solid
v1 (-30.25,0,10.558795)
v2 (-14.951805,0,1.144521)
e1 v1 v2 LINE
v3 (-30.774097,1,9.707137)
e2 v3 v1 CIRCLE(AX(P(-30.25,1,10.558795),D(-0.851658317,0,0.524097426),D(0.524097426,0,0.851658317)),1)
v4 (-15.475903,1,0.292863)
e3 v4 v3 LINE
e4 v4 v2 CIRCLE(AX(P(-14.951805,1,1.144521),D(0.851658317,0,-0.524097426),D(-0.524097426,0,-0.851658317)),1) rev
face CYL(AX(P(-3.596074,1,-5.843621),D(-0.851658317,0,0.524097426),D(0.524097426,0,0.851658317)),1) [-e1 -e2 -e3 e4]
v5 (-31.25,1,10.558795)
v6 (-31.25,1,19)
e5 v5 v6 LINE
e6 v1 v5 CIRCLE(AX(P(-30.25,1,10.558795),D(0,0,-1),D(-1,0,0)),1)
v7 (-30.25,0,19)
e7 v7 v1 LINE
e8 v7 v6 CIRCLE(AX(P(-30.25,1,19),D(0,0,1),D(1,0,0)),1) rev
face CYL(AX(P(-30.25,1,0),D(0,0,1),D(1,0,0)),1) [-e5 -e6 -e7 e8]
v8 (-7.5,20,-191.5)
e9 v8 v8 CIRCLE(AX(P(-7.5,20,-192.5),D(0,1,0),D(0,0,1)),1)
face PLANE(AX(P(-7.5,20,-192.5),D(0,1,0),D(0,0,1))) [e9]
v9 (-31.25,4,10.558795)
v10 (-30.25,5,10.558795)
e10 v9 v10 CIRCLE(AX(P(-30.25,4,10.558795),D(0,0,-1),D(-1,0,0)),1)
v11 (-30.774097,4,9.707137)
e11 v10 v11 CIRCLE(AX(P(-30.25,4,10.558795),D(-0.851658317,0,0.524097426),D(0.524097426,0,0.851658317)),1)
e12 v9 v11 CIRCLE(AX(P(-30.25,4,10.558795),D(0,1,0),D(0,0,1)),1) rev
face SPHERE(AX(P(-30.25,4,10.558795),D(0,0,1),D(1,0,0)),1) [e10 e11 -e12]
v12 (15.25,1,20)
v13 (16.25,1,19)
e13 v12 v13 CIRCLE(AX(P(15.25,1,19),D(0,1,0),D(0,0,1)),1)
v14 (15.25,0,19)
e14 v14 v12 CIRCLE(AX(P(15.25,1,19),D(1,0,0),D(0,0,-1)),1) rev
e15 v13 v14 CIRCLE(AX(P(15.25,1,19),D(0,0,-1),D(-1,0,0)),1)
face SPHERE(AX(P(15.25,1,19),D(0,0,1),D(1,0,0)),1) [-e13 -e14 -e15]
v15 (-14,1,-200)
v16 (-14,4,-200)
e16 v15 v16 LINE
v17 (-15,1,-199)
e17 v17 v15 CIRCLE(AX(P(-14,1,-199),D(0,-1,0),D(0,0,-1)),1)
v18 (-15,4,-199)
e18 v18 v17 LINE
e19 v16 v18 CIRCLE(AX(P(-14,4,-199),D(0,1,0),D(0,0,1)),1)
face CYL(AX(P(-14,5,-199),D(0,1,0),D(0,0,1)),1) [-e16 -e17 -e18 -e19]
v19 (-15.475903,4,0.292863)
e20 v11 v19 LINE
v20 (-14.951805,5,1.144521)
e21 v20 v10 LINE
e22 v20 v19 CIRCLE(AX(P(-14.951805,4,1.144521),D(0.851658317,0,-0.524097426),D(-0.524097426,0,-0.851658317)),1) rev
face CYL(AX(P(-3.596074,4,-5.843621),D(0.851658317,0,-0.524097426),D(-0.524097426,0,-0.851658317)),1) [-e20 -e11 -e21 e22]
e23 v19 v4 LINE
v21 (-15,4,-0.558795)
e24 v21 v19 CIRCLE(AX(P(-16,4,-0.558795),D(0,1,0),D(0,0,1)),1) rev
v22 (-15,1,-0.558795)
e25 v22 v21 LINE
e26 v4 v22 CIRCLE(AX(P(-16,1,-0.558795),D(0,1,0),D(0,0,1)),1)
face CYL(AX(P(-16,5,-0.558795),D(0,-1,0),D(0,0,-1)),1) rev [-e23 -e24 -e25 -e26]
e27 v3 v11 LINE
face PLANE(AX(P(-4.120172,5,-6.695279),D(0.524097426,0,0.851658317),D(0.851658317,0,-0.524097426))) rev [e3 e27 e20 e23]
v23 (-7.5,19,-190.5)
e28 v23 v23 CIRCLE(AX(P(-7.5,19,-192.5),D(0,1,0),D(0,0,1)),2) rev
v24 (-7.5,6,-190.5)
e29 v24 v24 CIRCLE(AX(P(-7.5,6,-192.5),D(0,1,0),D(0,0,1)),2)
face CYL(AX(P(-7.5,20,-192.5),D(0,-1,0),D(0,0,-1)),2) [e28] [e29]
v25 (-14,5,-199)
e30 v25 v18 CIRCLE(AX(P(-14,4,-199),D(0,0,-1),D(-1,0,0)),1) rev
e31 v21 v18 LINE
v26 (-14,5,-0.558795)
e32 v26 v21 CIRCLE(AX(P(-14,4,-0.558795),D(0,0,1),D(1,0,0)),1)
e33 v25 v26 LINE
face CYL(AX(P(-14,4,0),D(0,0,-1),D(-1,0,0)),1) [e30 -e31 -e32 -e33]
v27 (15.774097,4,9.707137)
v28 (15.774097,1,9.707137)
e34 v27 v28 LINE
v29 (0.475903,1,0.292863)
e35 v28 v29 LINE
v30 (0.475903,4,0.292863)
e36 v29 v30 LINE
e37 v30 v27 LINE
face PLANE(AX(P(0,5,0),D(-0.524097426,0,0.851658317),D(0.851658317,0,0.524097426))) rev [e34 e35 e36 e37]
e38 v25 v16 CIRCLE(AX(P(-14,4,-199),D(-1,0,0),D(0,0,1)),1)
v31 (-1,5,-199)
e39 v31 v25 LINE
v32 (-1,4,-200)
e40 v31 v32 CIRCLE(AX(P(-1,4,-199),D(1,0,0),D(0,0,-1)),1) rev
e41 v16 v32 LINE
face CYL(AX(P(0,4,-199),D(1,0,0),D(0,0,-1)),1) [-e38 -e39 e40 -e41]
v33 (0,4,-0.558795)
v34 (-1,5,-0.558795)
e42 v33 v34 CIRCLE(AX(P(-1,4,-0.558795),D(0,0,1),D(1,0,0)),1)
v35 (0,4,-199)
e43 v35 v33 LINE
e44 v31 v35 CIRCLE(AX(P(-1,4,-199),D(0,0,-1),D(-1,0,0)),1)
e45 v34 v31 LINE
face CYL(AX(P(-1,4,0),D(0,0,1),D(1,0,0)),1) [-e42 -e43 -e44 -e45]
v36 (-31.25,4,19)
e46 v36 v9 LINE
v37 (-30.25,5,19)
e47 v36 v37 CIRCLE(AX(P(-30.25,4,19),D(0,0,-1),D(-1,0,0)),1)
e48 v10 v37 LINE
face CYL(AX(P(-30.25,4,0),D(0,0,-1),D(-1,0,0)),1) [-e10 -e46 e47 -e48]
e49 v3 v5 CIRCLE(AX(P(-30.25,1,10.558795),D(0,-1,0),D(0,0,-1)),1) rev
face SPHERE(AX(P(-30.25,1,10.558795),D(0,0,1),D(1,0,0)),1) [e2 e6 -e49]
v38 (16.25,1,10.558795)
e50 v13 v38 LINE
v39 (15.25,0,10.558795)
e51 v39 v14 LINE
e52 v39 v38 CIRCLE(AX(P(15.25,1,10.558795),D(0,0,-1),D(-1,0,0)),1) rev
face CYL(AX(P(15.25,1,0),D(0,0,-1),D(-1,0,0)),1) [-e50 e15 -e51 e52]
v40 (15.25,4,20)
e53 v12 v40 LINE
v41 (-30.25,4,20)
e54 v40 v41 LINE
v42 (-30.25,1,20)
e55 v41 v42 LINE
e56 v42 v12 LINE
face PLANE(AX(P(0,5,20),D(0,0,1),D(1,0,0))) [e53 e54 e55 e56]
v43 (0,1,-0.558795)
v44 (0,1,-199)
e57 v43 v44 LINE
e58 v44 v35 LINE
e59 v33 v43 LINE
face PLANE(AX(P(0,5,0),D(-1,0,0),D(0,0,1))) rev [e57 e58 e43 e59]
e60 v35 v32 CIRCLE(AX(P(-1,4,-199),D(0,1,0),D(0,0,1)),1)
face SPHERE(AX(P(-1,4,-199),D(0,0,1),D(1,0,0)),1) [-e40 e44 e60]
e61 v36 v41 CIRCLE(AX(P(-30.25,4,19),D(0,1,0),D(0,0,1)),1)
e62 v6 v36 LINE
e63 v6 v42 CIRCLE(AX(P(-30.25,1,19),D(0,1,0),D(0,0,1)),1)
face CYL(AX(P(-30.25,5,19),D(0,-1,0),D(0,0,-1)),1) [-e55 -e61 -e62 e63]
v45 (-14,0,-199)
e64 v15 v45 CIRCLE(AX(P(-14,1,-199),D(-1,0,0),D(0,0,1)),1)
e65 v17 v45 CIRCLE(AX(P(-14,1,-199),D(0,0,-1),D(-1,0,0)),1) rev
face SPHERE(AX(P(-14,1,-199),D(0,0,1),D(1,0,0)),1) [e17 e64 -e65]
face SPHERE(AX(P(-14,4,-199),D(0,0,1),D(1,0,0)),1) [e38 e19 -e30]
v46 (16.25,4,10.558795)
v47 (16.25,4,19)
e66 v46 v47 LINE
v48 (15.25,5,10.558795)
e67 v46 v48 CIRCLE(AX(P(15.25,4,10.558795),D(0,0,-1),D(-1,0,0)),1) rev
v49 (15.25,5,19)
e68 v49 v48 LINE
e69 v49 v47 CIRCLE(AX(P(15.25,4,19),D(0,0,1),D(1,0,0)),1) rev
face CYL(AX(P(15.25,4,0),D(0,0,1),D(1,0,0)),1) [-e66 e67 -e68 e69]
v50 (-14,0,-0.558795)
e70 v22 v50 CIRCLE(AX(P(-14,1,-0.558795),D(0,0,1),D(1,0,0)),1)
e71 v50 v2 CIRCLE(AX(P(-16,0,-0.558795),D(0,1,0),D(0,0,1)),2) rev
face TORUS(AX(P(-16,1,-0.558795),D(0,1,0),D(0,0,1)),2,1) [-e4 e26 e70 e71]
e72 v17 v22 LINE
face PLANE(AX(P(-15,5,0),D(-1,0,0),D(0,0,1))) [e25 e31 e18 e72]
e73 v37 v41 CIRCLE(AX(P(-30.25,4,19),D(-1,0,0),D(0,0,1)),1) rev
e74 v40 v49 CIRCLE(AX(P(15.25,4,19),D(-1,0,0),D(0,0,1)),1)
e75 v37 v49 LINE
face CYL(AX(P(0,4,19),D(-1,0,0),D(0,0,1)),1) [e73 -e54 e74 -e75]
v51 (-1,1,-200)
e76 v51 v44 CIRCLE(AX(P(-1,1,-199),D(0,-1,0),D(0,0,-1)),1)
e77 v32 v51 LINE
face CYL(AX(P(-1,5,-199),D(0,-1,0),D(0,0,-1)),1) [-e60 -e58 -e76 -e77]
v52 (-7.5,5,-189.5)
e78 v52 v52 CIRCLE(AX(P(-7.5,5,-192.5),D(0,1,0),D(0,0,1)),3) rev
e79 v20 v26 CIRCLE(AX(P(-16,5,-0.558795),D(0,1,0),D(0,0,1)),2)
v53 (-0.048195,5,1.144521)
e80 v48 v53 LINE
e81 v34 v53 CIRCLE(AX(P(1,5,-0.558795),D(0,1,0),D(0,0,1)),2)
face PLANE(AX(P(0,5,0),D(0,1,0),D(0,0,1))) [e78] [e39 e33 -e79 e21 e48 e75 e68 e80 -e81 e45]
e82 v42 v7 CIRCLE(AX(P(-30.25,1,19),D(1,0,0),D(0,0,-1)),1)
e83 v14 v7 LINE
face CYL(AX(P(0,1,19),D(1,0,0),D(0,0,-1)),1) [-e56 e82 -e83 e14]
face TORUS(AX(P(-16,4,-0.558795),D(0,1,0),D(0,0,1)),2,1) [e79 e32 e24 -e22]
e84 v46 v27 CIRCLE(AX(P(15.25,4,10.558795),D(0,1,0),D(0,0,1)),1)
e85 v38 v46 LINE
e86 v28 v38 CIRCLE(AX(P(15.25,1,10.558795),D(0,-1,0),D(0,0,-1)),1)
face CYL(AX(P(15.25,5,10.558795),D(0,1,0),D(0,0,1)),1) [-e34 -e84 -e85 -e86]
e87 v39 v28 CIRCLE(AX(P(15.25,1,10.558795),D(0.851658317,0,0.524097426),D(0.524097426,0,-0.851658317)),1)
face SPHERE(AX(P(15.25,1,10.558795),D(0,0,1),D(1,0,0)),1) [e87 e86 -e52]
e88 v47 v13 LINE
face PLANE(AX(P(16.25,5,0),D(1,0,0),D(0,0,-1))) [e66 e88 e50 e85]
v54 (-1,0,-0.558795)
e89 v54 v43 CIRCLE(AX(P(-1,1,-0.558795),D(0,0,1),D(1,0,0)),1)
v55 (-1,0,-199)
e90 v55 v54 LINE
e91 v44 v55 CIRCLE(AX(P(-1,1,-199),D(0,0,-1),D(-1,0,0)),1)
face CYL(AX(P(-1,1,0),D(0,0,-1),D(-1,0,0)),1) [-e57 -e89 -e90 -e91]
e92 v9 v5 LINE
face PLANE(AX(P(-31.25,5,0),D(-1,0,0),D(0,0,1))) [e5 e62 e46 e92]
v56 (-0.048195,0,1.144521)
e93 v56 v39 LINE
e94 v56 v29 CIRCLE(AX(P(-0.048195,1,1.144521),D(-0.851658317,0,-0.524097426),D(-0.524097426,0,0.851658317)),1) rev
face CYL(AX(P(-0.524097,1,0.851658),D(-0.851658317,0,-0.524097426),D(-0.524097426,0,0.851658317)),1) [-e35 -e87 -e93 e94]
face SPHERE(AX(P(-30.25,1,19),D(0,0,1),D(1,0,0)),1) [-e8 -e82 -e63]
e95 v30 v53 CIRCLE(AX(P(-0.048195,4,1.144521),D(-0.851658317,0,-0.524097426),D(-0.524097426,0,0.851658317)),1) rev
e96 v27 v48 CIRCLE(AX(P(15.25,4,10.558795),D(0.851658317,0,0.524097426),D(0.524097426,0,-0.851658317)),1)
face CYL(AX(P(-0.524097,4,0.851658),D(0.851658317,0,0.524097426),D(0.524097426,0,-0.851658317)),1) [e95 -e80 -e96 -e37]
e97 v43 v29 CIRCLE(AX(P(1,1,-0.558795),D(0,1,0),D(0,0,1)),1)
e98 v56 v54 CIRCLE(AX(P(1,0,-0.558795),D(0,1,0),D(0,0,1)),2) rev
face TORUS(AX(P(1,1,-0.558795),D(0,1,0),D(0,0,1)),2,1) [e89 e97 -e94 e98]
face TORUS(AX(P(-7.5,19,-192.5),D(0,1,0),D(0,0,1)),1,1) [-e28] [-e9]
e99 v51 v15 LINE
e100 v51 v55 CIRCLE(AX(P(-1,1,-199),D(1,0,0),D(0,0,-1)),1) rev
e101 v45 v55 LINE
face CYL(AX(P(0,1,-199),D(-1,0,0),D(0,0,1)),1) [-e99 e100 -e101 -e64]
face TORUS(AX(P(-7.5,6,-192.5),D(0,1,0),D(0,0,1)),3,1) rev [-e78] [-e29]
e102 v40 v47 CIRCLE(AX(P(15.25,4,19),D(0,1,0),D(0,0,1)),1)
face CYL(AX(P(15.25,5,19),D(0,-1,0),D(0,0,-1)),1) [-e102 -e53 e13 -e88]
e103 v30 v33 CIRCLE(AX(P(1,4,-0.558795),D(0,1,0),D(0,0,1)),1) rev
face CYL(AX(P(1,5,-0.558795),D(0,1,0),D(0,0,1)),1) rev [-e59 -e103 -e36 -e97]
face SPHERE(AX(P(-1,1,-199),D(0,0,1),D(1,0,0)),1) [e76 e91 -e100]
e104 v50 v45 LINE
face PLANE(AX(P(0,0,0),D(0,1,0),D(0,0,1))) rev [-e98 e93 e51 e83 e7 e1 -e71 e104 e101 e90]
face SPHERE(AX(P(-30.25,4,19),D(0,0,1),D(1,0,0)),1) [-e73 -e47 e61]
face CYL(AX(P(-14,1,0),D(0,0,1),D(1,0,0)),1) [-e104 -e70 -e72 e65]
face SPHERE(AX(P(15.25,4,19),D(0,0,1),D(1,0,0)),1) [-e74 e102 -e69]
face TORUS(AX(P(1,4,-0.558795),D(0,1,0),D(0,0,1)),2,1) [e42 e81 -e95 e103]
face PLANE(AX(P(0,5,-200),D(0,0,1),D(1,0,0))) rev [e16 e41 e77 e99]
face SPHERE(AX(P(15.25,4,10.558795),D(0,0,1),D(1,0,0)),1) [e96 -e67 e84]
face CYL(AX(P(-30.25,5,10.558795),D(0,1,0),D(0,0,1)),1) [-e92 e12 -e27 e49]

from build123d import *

# Parameters (mm, degrees)
SKETCH1_W           = 15
SKETCH1_H           = 200
SKETCH1_W_2         = 47.5
SKETCH1_H_2         = 10
BOSS_EXTRUDE1_DEPTH = 5
SKETCH4_R           = 2
BOSS_EXTRUDE3_DEPTH = 15
FILLET5_R           = 1
FILLET6_R           = 1


with BuildPart() as part:
    # Sketch1 → Boss-Extrude1 (new body)
    with BuildSketch(Plane(origin=(0, 0, 0), x_dir=(1, 0, 0), z_dir=(0, 1, 0))):
        Polygon((-31.25, -10), (16.25, -10), (0, 0), (-15, 0), align=None)
        with Locations((-7.5, 100)):
            Rectangle(SKETCH1_W, SKETCH1_H)
        with Locations((-7.5, -15)):
            Rectangle(SKETCH1_W_2, SKETCH1_H_2)
    extrude(amount=BOSS_EXTRUDE1_DEPTH)

    # Sketch4 → Boss-Extrude3 (add)
    with BuildSketch(Plane(origin=(0, 5, 0), x_dir=(1, 0, 0), z_dir=(0, 1, 0))):
        with Locations(Location((-7.5, 192.5, 0), (0, 0, 270))):
            Circle(SKETCH4_R)
    extrude(amount=BOSS_EXTRUDE3_DEPTH)

    # Fillet5
    fillet5_edges = [part.edges().sort_by_distance(p)[0] for p in [
        (-31.25, 5, 15),
        (-7.5, 0, -200),
        (0, 0, -100),
        (8.125, 0, 5),
        (16.25, 0, 15),
        (-7.5, 0, 20),
        (-31.25, 0, 15),
        (-23.125, 0, 5),
        (-7.5, 5, 20),
        (-15, 2.5, 0),
        (-15, 2.5, -200),
        (0, 2.5, -200),
        (0, 2.5, 0),
        (16.25, 2.5, 10),
        (-31.25, 2.5, 10),
        (16.25, 5, 15),
        (8.125, 5, 5),
        (-7.5, 5, -194.5),
        (-7.5, 20, -194.5),
        (0, 5, -100),
        (-7.5, 5, -200),
        (-15, 5, -100),
        (-23.125, 5, 5),
        (-15, 0, -100),
    ]]
    fillet(fillet5_edges, radius=FILLET5_R)

    # Fillet6
    # the kernel refuses this fillet: 1 mm, written as the material it takes off along each edge
    with BuildSketch(Plane(origin=(15.25, 4, 19), x_dir=(1, 0, 0), z_dir=(0, 0, 1))) as fillet6_piece_1_section:
        Polygon((0, 0), (FILLET6_R, 0), (FILLET6_R, FILLET6_R), (0, FILLET6_R), align=None)
    fillet6_piece_1 = extrude(amount=FILLET6_R, mode=Mode.PRIVATE)
    fillet6_piece_1 = fillet6_piece_1 - Plane(origin=(15.25, 4, 19), x_dir=(-0.7071067811865475, -0.7071067811865475, 0), z_dir=(0, 0, 1)) * Sphere(FILLET6_R, mode=Mode.PRIVATE)
    add(fillet6_piece_1, mode=Mode.SUBTRACT)
    with BuildSketch(Plane(origin=(15.25, 1, 19), x_dir=(1, 0, 0), z_dir=(0, 0, 1))) as fillet6_piece_2_section:
        Polygon((0, 0), (FILLET6_R, 0), (FILLET6_R, -FILLET6_R), (0, -FILLET6_R), align=None)
    fillet6_piece_2 = extrude(amount=FILLET6_R, mode=Mode.PRIVATE)
    fillet6_piece_2 = fillet6_piece_2 - Plane(origin=(15.25, 1, 19), x_dir=(-0.7071067811865475, 0.7071067811865475, 0), z_dir=(0, 0, 1)) * Sphere(FILLET6_R, mode=Mode.PRIVATE)
    add(fillet6_piece_2, mode=Mode.SUBTRACT)
    with BuildSketch(Plane(origin=(-30.25, 4, 19), x_dir=(0, 0, 1), z_dir=(-1, 0, 0))) as fillet6_piece_3_section:
        Polygon((0, 0), (FILLET6_R, 0), (FILLET6_R, FILLET6_R), (0, FILLET6_R), align=None)
    fillet6_piece_3 = extrude(amount=FILLET6_R, mode=Mode.PRIVATE)
    fillet6_piece_3 = fillet6_piece_3 - Plane(origin=(-30.25, 4, 19), x_dir=(0, -0.7071067811865475, -0.7071067811865475), z_dir=(-1, 0, 0)) * Sphere(FILLET6_R, mode=Mode.PRIVATE)
    add(fillet6_piece_3, mode=Mode.SUBTRACT)
    with BuildSketch(Plane(origin=(-30.25, 1, 19), x_dir=(0, 0, 1), z_dir=(-1, 0, 0))) as fillet6_piece_4_section:
        Polygon((0, 0), (FILLET6_R, 0), (FILLET6_R, -FILLET6_R), (0, -FILLET6_R), align=None)
    fillet6_piece_4 = extrude(amount=FILLET6_R, mode=Mode.PRIVATE)
    fillet6_piece_4 = fillet6_piece_4 - Plane(origin=(-30.25, 1, 19), x_dir=(0, 0.7071067811865475, -0.7071067811865475), z_dir=(-1, 0, 0)) * Sphere(FILLET6_R, mode=Mode.PRIVATE)
    add(fillet6_piece_4, mode=Mode.SUBTRACT)
    with BuildSketch(Plane(origin=(-31.25, 1, 20), x_dir=(0, 0, -1), z_dir=(0, 1, 0)), Plane(origin=(16.25, 1, 20), x_dir=(-1, 0, 0), z_dir=(0, 1, 0))) as fillet6_piece_5:
        with BuildLine():
            CenterArc((FILLET6_R, -FILLET6_R), FILLET6_R, 90, 90)
            Line((0, -FILLET6_R), (0, 0))
            Line((0, 0), (FILLET6_R, 0))
        make_face()
    extrude(amount=3, mode=Mode.SUBTRACT)


solid = part.part
